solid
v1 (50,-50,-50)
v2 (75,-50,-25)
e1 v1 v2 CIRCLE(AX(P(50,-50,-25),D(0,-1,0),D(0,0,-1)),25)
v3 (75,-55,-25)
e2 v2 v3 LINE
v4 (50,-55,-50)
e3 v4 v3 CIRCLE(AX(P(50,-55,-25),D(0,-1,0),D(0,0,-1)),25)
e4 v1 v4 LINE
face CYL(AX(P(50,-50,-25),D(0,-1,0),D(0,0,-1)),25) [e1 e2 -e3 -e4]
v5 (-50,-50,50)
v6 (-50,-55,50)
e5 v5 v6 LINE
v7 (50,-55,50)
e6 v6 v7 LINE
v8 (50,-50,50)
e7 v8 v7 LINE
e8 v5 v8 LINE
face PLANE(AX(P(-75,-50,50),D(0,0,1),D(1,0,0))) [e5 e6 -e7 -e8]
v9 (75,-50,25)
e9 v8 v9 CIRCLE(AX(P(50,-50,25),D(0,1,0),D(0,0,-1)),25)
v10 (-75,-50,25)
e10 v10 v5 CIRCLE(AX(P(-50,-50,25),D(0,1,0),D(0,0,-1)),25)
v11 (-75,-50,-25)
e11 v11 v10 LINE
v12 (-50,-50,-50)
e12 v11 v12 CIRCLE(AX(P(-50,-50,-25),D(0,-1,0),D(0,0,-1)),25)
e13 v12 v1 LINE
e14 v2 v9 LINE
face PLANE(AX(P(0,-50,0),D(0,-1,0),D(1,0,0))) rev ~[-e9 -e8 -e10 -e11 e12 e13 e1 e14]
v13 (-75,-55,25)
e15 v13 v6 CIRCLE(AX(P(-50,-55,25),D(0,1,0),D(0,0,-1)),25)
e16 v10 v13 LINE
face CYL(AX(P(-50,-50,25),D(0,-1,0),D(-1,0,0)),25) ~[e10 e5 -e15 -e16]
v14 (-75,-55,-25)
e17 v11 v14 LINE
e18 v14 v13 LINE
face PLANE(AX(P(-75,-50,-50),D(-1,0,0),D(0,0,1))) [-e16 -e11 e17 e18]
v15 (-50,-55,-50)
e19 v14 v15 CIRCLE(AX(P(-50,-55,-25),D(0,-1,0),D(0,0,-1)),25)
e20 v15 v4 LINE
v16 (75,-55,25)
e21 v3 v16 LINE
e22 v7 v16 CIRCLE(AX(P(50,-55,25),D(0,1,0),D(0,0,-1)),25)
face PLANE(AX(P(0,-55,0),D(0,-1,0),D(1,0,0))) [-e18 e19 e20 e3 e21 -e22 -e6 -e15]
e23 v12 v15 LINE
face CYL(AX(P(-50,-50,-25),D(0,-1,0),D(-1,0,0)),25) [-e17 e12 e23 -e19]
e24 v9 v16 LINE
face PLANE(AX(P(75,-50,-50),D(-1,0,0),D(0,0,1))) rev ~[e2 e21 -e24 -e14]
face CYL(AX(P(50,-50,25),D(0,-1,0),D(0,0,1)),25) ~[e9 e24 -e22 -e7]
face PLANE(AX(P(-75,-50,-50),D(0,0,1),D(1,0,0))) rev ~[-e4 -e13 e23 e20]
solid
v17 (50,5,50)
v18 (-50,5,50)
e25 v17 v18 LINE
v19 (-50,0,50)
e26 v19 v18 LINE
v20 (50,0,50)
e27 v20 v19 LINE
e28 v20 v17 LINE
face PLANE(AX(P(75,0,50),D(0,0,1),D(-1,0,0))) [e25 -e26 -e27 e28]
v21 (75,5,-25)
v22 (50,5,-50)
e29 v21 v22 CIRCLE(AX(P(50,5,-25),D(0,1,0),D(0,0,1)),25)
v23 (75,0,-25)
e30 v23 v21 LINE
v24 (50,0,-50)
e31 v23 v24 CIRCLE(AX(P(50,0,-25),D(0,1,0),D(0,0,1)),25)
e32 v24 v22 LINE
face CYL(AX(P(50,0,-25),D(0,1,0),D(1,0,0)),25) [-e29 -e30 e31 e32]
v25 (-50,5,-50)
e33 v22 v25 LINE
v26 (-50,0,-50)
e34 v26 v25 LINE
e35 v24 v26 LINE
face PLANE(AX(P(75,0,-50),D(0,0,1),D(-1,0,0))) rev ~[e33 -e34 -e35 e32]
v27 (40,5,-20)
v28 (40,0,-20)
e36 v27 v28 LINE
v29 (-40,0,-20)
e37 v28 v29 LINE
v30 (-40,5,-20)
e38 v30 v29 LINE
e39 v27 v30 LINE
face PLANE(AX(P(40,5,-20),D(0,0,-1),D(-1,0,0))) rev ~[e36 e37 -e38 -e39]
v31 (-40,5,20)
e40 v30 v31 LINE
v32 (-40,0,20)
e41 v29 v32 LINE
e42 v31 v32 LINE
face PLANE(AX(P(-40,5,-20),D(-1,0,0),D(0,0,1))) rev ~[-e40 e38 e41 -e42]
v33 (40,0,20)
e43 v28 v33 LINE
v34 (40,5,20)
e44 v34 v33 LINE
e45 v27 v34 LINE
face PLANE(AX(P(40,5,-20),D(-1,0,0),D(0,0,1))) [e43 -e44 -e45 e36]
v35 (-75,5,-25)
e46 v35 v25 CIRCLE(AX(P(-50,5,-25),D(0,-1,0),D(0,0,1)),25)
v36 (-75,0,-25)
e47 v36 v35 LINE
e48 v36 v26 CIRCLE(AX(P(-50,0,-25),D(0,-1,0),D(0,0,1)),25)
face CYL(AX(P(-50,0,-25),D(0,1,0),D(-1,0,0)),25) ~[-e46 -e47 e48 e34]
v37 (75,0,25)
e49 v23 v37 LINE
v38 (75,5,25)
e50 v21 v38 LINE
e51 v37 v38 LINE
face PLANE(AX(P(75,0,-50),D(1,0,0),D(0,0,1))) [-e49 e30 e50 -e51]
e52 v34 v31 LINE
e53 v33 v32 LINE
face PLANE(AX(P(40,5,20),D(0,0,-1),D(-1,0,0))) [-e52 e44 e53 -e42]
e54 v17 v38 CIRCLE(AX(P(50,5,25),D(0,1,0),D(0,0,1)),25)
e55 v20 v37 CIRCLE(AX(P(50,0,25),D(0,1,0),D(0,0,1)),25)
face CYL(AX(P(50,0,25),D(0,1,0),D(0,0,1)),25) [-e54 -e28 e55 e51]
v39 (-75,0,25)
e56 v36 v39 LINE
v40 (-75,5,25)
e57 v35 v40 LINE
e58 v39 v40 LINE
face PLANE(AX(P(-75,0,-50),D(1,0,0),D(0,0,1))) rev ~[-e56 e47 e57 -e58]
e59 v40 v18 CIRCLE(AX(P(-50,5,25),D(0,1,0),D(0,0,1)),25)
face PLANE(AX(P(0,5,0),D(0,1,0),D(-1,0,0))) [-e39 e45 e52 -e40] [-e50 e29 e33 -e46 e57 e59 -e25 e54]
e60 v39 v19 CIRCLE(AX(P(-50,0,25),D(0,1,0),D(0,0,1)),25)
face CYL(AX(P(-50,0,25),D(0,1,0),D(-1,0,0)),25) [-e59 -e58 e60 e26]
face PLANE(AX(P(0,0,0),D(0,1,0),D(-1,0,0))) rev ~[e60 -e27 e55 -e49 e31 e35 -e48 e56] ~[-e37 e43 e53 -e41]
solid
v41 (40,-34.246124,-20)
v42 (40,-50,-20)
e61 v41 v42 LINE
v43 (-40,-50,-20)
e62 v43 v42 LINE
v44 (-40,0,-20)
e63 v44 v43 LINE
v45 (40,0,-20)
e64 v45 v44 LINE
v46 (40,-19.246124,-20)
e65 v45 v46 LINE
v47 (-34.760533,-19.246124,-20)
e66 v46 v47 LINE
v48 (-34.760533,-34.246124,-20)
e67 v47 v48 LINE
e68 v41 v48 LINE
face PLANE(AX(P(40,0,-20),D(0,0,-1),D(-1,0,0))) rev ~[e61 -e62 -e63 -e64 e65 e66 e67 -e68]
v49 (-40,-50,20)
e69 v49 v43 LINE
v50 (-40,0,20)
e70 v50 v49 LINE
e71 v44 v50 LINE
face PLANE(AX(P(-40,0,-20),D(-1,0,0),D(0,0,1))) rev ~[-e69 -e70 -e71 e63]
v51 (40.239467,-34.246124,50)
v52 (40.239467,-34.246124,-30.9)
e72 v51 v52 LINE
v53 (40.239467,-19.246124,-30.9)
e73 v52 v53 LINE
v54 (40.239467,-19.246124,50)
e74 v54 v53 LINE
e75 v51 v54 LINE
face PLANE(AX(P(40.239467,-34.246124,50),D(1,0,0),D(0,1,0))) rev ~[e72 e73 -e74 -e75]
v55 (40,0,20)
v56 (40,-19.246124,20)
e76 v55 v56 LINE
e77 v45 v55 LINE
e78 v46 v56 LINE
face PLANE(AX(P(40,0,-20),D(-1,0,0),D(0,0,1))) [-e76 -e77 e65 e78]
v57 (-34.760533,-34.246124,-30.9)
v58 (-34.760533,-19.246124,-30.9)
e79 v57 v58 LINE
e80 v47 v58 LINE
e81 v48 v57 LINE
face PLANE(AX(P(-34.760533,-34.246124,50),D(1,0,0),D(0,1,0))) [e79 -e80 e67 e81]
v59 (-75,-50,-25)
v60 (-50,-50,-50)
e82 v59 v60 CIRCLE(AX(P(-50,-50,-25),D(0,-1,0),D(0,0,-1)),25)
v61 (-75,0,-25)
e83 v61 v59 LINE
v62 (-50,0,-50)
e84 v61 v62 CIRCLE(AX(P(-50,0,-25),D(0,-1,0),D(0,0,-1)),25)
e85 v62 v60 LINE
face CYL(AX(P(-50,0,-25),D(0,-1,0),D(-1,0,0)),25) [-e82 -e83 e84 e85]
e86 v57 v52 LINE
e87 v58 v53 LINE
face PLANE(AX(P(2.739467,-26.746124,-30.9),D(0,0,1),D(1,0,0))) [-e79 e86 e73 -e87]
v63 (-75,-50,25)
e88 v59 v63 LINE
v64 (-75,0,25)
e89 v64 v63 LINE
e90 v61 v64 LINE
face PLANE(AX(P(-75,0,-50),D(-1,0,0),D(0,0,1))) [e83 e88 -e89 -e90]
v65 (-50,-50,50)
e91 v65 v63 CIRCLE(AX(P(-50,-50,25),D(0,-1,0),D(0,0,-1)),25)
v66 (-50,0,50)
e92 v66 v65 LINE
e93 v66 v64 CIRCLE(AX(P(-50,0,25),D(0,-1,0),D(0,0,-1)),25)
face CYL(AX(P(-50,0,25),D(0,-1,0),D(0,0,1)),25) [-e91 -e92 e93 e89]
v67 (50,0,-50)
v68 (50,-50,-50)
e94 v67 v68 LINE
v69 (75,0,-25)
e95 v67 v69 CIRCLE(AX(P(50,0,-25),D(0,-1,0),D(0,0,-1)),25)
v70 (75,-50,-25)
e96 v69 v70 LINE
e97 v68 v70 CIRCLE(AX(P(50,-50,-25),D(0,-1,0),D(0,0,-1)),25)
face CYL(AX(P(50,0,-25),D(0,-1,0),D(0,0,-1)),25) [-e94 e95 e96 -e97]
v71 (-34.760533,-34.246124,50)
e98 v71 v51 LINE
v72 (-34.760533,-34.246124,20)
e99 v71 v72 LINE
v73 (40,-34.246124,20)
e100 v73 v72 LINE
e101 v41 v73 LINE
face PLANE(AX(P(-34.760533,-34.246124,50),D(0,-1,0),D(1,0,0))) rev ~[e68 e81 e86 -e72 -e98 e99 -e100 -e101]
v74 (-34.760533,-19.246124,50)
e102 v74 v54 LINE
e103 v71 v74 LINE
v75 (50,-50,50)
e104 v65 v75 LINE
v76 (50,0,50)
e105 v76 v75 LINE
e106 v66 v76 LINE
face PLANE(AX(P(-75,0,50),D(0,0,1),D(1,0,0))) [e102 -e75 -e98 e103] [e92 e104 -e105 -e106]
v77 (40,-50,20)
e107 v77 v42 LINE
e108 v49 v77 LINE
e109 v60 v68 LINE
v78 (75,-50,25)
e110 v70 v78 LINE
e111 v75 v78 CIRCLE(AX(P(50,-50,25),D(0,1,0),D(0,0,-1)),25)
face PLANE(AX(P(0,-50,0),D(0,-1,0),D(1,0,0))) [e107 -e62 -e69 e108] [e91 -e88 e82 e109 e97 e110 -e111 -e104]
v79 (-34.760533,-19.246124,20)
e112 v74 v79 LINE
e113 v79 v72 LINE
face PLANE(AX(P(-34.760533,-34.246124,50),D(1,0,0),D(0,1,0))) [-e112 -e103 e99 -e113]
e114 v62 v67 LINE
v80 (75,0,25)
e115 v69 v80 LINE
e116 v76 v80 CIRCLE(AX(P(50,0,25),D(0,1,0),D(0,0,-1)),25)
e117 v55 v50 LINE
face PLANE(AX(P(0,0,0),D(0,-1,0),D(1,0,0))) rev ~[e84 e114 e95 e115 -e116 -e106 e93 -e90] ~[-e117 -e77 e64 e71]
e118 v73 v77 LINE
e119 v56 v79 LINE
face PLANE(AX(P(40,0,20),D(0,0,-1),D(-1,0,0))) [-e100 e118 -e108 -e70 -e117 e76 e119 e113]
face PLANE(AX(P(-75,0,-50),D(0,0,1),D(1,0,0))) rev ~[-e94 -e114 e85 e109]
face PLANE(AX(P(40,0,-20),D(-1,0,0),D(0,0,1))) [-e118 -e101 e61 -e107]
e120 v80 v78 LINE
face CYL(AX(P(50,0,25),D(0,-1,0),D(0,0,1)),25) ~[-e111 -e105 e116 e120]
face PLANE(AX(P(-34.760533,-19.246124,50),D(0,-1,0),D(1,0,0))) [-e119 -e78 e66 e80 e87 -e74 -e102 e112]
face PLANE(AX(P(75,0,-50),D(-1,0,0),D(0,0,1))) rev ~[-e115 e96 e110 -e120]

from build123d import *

# Parameters (mm, degrees)
F0_W      = 150
F0_H      = 100
F1_DEPTH  = 50
F2_DEPTH  = 5
F3_W      = 80
F3_H      = 40
F4_DEPTH  = 100
F5_W      = 150
F5_H      = 100
F6_DEPTH  = 5
F8_R      = 25
F9_R      = 25
F10_R     = 25
F11_R     = 25
F12_R     = 25
F13_R     = 25
F14_R     = 25
F15_R     = 25
F16_R     = 25
F17_R     = 25
F18_R     = 25
F19_R     = 25
F20_W     = 80
F20_H     = 40
F21_DEPTH = 100
F22_W     = 75
F22_H     = 15
F23_DEPTH = 80.9


with BuildPart() as f1:
    # F0 (on Front) → F1 (new body)
    with BuildSketch(Plane.XZ):
        Rectangle(F0_W, F0_H)
    extrude(amount=F1_DEPTH)


with BuildPart() as f2:
    # F2 (new): a face of the model
    f2_faces = [f1.part.faces().sort_by_distance(p)[0] for p in [
        (0, -50, 0),
    ]]
    extrude(f2_faces, amount=F2_DEPTH)

    # F12
    f12_edges = [f2.edges().sort_by_distance(p)[0] for p in [
        (-75, -52.5, 50),
    ]]
    fillet(f12_edges, radius=F12_R)

    # F13
    f13_edges = [f2.edges().sort_by_distance(p)[0] for p in [
        (75, -52.5, 50),
    ]]
    fillet(f13_edges, radius=F13_R)

    # F14
    f14_edges = [f2.edges().sort_by_distance(p)[0] for p in [
        (-75, -52.5, -50),
    ]]
    fillet(f14_edges, radius=F14_R)

    # F15
    f15_edges = [f2.edges().sort_by_distance(p)[0] for p in [
        (75, -52.5, -50),
    ]]
    fillet(f15_edges, radius=F15_R)


with BuildPart() as f1_1:
    add(f1.part)

    # F3 (on face) → F4 (cut)
    with BuildSketch(Plane(origin=(0, 0, 0), x_dir=(-1, 0, 0), z_dir=(0, 1, 0))):
        Rectangle(F3_W, F3_H)
    extrude(amount=-F4_DEPTH, mode=Mode.SUBTRACT)

    # F8
    f8_edges = [f1_1.edges().sort_by_distance(p)[0] for p in [
        (75, -25, 50),
    ]]
    fillet(f8_edges, radius=F8_R)

    # F9
    f9_edges = [f1_1.edges().sort_by_distance(p)[0] for p in [
        (-75, -25, 50),
    ]]
    fillet(f9_edges, radius=F9_R)

    # F10
    f10_edges = [f1_1.edges().sort_by_distance(p)[0] for p in [
        (-75, -25, -50),
    ]]
    fillet(f10_edges, radius=F10_R)

    # F11
    f11_edges = [f1_1.edges().sort_by_distance(p)[0] for p in [
        (75, -25, -50),
    ]]
    fillet(f11_edges, radius=F11_R)

    # F22 (on face) → F23 (cut)
    with BuildSketch(Plane.XY.offset(50)):
        with Locations((2.7394670993, -26.7461243272)):
            Rectangle(F22_W, F22_H)
    extrude(amount=-F23_DEPTH, mode=Mode.SUBTRACT)


with BuildPart() as f6:
    # F5 (on face) → F6 (new body)
    with BuildSketch(Plane(origin=(0, 0, 0), x_dir=(-1, 0, 0), z_dir=(0, 1, 0))):
        Rectangle(F5_W, F5_H)
    extrude(amount=F6_DEPTH)

    # F16
    f16_edges = [f6.edges().sort_by_distance(p)[0] for p in [
        (-75, 2.5, 50),
    ]]
    fillet(f16_edges, radius=F16_R)

    # F17
    f17_edges = [f6.edges().sort_by_distance(p)[0] for p in [
        (-75, 2.5, -50),
    ]]
    fillet(f17_edges, radius=F17_R)

    # F18
    f18_edges = [f6.edges().sort_by_distance(p)[0] for p in [
        (75, 2.5, 50),
    ]]
    fillet(f18_edges, radius=F18_R)

    # F19
    f19_edges = [f6.edges().sort_by_distance(p)[0] for p in [
        (75, 2.5, -50),
    ]]
    fillet(f19_edges, radius=F19_R)

    # F20 (on face) → F21 (cut)
    with BuildSketch(Plane(origin=(0, 5, 0), x_dir=(-1, 0, 0), z_dir=(0, 1, 0))):
        Rectangle(F20_W, F20_H)
    extrude(amount=-F21_DEPTH, mode=Mode.SUBTRACT)


solid = Compound([f2.part, f1_1.part, f6.part])
